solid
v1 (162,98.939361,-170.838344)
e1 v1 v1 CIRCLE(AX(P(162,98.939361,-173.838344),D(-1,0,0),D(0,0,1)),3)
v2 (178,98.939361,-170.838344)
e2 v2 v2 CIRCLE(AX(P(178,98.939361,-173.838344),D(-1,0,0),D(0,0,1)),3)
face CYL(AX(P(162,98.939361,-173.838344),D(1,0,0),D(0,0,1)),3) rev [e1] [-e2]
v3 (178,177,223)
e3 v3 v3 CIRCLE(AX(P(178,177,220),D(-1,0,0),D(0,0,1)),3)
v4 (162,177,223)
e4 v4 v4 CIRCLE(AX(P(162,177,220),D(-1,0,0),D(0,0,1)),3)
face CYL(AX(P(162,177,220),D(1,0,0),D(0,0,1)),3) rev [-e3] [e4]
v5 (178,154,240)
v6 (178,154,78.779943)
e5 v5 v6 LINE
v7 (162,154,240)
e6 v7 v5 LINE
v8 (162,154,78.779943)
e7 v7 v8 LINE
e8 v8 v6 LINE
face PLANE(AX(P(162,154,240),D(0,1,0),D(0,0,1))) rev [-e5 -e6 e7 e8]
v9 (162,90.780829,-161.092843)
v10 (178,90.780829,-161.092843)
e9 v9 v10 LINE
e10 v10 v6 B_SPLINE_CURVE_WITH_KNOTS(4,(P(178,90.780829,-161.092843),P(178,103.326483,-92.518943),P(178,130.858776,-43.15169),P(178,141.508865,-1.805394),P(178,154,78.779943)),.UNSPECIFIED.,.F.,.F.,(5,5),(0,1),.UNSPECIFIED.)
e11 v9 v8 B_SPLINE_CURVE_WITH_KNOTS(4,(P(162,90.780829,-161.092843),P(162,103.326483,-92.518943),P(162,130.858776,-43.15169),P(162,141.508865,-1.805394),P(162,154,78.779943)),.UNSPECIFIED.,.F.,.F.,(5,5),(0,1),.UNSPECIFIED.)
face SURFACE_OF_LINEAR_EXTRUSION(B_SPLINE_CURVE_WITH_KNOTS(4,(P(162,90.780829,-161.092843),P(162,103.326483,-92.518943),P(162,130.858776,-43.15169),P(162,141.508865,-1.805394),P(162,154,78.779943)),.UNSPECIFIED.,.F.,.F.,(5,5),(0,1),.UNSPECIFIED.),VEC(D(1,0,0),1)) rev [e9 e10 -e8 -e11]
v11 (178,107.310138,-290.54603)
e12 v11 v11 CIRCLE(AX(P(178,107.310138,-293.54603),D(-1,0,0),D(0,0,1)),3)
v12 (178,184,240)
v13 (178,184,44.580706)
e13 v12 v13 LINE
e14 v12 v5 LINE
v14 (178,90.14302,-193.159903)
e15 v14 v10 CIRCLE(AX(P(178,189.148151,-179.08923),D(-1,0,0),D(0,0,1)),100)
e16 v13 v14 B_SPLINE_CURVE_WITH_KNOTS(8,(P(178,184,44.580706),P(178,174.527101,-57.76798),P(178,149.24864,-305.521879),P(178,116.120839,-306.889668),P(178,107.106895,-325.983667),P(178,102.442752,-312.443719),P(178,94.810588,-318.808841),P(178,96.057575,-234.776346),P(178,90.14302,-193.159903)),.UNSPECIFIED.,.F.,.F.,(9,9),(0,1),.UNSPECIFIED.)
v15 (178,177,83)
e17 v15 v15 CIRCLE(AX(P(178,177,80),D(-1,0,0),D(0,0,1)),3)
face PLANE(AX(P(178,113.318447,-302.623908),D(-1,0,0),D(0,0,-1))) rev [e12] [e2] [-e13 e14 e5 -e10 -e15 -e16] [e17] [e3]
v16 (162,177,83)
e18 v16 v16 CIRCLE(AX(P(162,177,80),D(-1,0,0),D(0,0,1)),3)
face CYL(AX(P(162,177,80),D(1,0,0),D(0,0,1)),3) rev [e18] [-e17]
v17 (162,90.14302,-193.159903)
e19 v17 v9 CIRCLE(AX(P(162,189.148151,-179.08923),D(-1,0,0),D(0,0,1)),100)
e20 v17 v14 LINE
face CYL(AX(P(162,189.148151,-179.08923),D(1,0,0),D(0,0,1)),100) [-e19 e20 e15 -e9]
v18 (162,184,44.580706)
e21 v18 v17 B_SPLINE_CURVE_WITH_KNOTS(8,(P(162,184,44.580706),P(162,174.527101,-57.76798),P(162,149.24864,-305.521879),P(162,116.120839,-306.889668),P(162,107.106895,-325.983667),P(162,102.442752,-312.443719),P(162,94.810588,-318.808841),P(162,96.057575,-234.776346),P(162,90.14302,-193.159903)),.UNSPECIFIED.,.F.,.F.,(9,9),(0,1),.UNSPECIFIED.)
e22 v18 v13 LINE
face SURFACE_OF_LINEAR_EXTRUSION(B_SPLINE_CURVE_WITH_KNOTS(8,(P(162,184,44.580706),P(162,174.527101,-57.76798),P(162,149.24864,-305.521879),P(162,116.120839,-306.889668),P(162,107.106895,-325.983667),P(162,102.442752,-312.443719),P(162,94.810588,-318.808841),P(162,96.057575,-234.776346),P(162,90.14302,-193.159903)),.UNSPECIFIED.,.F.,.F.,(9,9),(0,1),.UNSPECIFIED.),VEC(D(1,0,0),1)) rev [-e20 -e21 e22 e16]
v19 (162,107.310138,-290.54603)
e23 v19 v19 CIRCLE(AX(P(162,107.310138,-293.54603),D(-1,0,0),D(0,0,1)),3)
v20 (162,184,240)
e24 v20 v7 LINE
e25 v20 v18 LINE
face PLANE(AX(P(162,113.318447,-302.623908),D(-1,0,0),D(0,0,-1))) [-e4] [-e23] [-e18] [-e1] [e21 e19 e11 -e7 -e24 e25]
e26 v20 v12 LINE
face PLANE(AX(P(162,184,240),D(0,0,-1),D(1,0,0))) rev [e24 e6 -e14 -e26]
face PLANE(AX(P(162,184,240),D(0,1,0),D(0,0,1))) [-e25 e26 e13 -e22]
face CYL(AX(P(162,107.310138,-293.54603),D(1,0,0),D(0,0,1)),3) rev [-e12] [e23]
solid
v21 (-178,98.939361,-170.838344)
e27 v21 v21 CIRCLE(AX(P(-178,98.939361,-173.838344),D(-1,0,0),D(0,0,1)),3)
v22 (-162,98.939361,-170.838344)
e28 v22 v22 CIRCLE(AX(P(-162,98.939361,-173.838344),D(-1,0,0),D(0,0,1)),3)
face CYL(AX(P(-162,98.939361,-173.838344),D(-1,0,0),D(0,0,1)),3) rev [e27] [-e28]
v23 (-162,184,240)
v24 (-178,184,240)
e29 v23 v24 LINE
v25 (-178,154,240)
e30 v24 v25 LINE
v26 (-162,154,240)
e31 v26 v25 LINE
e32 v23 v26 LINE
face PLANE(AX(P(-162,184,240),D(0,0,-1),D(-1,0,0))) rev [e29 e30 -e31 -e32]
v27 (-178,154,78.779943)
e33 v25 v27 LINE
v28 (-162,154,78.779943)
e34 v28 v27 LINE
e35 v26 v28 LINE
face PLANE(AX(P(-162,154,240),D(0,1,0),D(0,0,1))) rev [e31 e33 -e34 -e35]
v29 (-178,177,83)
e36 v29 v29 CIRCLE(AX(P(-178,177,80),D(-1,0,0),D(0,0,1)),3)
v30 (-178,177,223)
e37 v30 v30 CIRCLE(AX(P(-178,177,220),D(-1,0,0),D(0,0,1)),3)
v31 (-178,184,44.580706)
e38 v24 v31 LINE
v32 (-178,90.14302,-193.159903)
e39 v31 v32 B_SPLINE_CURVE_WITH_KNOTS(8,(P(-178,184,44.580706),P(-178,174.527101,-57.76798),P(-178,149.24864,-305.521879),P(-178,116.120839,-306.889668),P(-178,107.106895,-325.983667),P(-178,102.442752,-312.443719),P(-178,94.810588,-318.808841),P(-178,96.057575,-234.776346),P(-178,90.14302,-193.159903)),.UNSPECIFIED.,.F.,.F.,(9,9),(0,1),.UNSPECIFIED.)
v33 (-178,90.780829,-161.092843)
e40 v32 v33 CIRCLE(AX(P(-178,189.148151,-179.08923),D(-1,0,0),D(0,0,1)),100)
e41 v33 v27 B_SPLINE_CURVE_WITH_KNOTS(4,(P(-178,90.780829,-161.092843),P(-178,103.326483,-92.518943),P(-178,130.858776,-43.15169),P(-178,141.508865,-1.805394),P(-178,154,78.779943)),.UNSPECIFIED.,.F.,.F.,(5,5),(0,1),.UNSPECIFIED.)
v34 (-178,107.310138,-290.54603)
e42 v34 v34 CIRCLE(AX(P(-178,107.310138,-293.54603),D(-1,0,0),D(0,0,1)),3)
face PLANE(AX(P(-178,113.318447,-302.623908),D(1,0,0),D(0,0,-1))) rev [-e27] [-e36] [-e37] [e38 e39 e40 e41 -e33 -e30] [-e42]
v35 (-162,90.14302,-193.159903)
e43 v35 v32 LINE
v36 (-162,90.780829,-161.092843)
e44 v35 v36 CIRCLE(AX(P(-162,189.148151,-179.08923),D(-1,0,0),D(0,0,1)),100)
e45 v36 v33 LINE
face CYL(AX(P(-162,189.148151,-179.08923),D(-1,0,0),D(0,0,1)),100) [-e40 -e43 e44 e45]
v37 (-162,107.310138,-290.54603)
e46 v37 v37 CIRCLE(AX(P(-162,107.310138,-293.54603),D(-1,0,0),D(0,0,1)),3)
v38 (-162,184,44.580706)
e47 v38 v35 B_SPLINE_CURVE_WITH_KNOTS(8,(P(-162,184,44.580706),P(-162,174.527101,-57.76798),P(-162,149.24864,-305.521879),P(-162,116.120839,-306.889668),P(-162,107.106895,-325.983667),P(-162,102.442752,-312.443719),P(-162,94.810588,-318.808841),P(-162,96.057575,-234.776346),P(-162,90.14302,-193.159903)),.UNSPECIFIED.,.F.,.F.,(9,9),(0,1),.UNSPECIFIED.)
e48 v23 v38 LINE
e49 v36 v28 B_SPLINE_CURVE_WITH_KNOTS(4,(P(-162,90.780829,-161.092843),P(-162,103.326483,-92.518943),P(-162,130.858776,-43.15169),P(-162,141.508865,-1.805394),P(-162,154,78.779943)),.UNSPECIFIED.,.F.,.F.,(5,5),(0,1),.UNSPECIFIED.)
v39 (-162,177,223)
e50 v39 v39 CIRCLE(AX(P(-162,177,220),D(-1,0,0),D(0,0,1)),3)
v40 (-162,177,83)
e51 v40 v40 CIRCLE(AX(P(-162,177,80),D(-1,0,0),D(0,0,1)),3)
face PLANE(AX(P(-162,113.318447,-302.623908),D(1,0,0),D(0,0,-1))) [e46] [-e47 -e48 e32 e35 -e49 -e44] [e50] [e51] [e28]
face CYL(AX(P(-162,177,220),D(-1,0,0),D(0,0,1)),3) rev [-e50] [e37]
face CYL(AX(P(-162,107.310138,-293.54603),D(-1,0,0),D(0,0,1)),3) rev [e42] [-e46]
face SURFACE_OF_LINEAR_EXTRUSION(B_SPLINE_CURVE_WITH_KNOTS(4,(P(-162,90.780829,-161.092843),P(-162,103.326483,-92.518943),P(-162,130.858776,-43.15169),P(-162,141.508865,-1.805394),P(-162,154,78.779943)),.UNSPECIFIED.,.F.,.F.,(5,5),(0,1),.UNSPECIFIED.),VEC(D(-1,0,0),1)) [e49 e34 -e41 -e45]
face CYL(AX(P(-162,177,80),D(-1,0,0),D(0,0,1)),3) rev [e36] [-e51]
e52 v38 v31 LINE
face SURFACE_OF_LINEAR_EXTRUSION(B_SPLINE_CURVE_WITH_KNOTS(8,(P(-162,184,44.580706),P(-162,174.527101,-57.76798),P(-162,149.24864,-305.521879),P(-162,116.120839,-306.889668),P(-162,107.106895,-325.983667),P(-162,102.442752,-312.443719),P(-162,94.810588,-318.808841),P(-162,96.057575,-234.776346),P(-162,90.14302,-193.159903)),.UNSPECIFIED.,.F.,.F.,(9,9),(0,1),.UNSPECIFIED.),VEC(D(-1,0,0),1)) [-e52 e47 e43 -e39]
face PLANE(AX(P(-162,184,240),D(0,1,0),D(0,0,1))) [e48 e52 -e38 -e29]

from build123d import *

# Parameters (mm, degrees)
BOSS_EXTRUDE1_START     = -8
BOSS_EXTRUDE1_DEPTH     = 16
CUT_EXTRUDE1_DEPTH      = 357.850215718
CUT_EXTRUDE1_DEPTH_BACK = 357.850215718
SKETCH3_R               = 3


# Read off the part's stored shape, not the designer's step: Boss-Extrude1
with BuildPart() as part:
    # Boss-Extrude1 outline → Boss-Extrude1 (new body)
    with BuildSketch(Plane.ZY.offset(170).offset(BOSS_EXTRUDE1_START)):
        with BuildLine():
            Line((240, 154), (240, 184))
            Line((240, 184), (44.580705645, 184))
            add(Edge.make_bspline(
                [(44.580705645, 184), (-57.767979852, 174.527100953), (-305.521879125, 149.248640345), (-306.889667667, 116.120839414), (-325.983667032, 107.106894681), (-312.443719399, 102.442751763), (-318.80884118, 94.810587603), (-234.776346203, 96.05757536), (-193.159902981, 90.143019518)],
                knots=[0, 0, 0, 0, 0, 0, 0, 0, 0, 1, 1, 1, 1, 1, 1, 1, 1, 1], degree=8))
            ThreePointArc((-193.159902981, 90.143019518), (-177.100635592, 89.167925938), (-161.092843133, 90.78082926))
            add(Edge.make_bspline(
                [(-161.092843133, 90.78082926), (-92.518943208, 103.326483389), (-43.151690065, 130.858776096), (-1.805394367, 141.508864751), (78.779942876, 154)],
                knots=[0, 0, 0, 0, 0, 1, 1, 1, 1, 1], degree=4))
            Line((78.779942876, 154), (240, 154))
        make_face()
    extrude(amount=BOSS_EXTRUDE1_DEPTH)

    # Sketch3 → Cut-Extrude1 (cut, two sides: drawn at the far end of the back side and taken through both)
    with BuildSketch(Plane.ZY.offset(170).offset(-CUT_EXTRUDE1_DEPTH_BACK)):
        with Locations((-293.546030237, 107.310137802)):
            Circle(SKETCH3_R)
        with Locations((-173.838344205, 98.939360953)):
            Circle(SKETCH3_R)
        with Locations((220, 177)):
            Circle(SKETCH3_R)
        with Locations((80, 177)):
            Circle(SKETCH3_R)
    extrude(amount=CUT_EXTRUDE1_DEPTH + CUT_EXTRUDE1_DEPTH_BACK, mode=Mode.SUBTRACT)


with BuildPart() as body_2:
    # Mirror2: mirrored copy
    add(part.part.mirror(Plane(origin=(0, 0, 0), x_dir=(0, 0, 1), z_dir=(1, 0, 0))))


solid = Compound([part.part, body_2.part])
